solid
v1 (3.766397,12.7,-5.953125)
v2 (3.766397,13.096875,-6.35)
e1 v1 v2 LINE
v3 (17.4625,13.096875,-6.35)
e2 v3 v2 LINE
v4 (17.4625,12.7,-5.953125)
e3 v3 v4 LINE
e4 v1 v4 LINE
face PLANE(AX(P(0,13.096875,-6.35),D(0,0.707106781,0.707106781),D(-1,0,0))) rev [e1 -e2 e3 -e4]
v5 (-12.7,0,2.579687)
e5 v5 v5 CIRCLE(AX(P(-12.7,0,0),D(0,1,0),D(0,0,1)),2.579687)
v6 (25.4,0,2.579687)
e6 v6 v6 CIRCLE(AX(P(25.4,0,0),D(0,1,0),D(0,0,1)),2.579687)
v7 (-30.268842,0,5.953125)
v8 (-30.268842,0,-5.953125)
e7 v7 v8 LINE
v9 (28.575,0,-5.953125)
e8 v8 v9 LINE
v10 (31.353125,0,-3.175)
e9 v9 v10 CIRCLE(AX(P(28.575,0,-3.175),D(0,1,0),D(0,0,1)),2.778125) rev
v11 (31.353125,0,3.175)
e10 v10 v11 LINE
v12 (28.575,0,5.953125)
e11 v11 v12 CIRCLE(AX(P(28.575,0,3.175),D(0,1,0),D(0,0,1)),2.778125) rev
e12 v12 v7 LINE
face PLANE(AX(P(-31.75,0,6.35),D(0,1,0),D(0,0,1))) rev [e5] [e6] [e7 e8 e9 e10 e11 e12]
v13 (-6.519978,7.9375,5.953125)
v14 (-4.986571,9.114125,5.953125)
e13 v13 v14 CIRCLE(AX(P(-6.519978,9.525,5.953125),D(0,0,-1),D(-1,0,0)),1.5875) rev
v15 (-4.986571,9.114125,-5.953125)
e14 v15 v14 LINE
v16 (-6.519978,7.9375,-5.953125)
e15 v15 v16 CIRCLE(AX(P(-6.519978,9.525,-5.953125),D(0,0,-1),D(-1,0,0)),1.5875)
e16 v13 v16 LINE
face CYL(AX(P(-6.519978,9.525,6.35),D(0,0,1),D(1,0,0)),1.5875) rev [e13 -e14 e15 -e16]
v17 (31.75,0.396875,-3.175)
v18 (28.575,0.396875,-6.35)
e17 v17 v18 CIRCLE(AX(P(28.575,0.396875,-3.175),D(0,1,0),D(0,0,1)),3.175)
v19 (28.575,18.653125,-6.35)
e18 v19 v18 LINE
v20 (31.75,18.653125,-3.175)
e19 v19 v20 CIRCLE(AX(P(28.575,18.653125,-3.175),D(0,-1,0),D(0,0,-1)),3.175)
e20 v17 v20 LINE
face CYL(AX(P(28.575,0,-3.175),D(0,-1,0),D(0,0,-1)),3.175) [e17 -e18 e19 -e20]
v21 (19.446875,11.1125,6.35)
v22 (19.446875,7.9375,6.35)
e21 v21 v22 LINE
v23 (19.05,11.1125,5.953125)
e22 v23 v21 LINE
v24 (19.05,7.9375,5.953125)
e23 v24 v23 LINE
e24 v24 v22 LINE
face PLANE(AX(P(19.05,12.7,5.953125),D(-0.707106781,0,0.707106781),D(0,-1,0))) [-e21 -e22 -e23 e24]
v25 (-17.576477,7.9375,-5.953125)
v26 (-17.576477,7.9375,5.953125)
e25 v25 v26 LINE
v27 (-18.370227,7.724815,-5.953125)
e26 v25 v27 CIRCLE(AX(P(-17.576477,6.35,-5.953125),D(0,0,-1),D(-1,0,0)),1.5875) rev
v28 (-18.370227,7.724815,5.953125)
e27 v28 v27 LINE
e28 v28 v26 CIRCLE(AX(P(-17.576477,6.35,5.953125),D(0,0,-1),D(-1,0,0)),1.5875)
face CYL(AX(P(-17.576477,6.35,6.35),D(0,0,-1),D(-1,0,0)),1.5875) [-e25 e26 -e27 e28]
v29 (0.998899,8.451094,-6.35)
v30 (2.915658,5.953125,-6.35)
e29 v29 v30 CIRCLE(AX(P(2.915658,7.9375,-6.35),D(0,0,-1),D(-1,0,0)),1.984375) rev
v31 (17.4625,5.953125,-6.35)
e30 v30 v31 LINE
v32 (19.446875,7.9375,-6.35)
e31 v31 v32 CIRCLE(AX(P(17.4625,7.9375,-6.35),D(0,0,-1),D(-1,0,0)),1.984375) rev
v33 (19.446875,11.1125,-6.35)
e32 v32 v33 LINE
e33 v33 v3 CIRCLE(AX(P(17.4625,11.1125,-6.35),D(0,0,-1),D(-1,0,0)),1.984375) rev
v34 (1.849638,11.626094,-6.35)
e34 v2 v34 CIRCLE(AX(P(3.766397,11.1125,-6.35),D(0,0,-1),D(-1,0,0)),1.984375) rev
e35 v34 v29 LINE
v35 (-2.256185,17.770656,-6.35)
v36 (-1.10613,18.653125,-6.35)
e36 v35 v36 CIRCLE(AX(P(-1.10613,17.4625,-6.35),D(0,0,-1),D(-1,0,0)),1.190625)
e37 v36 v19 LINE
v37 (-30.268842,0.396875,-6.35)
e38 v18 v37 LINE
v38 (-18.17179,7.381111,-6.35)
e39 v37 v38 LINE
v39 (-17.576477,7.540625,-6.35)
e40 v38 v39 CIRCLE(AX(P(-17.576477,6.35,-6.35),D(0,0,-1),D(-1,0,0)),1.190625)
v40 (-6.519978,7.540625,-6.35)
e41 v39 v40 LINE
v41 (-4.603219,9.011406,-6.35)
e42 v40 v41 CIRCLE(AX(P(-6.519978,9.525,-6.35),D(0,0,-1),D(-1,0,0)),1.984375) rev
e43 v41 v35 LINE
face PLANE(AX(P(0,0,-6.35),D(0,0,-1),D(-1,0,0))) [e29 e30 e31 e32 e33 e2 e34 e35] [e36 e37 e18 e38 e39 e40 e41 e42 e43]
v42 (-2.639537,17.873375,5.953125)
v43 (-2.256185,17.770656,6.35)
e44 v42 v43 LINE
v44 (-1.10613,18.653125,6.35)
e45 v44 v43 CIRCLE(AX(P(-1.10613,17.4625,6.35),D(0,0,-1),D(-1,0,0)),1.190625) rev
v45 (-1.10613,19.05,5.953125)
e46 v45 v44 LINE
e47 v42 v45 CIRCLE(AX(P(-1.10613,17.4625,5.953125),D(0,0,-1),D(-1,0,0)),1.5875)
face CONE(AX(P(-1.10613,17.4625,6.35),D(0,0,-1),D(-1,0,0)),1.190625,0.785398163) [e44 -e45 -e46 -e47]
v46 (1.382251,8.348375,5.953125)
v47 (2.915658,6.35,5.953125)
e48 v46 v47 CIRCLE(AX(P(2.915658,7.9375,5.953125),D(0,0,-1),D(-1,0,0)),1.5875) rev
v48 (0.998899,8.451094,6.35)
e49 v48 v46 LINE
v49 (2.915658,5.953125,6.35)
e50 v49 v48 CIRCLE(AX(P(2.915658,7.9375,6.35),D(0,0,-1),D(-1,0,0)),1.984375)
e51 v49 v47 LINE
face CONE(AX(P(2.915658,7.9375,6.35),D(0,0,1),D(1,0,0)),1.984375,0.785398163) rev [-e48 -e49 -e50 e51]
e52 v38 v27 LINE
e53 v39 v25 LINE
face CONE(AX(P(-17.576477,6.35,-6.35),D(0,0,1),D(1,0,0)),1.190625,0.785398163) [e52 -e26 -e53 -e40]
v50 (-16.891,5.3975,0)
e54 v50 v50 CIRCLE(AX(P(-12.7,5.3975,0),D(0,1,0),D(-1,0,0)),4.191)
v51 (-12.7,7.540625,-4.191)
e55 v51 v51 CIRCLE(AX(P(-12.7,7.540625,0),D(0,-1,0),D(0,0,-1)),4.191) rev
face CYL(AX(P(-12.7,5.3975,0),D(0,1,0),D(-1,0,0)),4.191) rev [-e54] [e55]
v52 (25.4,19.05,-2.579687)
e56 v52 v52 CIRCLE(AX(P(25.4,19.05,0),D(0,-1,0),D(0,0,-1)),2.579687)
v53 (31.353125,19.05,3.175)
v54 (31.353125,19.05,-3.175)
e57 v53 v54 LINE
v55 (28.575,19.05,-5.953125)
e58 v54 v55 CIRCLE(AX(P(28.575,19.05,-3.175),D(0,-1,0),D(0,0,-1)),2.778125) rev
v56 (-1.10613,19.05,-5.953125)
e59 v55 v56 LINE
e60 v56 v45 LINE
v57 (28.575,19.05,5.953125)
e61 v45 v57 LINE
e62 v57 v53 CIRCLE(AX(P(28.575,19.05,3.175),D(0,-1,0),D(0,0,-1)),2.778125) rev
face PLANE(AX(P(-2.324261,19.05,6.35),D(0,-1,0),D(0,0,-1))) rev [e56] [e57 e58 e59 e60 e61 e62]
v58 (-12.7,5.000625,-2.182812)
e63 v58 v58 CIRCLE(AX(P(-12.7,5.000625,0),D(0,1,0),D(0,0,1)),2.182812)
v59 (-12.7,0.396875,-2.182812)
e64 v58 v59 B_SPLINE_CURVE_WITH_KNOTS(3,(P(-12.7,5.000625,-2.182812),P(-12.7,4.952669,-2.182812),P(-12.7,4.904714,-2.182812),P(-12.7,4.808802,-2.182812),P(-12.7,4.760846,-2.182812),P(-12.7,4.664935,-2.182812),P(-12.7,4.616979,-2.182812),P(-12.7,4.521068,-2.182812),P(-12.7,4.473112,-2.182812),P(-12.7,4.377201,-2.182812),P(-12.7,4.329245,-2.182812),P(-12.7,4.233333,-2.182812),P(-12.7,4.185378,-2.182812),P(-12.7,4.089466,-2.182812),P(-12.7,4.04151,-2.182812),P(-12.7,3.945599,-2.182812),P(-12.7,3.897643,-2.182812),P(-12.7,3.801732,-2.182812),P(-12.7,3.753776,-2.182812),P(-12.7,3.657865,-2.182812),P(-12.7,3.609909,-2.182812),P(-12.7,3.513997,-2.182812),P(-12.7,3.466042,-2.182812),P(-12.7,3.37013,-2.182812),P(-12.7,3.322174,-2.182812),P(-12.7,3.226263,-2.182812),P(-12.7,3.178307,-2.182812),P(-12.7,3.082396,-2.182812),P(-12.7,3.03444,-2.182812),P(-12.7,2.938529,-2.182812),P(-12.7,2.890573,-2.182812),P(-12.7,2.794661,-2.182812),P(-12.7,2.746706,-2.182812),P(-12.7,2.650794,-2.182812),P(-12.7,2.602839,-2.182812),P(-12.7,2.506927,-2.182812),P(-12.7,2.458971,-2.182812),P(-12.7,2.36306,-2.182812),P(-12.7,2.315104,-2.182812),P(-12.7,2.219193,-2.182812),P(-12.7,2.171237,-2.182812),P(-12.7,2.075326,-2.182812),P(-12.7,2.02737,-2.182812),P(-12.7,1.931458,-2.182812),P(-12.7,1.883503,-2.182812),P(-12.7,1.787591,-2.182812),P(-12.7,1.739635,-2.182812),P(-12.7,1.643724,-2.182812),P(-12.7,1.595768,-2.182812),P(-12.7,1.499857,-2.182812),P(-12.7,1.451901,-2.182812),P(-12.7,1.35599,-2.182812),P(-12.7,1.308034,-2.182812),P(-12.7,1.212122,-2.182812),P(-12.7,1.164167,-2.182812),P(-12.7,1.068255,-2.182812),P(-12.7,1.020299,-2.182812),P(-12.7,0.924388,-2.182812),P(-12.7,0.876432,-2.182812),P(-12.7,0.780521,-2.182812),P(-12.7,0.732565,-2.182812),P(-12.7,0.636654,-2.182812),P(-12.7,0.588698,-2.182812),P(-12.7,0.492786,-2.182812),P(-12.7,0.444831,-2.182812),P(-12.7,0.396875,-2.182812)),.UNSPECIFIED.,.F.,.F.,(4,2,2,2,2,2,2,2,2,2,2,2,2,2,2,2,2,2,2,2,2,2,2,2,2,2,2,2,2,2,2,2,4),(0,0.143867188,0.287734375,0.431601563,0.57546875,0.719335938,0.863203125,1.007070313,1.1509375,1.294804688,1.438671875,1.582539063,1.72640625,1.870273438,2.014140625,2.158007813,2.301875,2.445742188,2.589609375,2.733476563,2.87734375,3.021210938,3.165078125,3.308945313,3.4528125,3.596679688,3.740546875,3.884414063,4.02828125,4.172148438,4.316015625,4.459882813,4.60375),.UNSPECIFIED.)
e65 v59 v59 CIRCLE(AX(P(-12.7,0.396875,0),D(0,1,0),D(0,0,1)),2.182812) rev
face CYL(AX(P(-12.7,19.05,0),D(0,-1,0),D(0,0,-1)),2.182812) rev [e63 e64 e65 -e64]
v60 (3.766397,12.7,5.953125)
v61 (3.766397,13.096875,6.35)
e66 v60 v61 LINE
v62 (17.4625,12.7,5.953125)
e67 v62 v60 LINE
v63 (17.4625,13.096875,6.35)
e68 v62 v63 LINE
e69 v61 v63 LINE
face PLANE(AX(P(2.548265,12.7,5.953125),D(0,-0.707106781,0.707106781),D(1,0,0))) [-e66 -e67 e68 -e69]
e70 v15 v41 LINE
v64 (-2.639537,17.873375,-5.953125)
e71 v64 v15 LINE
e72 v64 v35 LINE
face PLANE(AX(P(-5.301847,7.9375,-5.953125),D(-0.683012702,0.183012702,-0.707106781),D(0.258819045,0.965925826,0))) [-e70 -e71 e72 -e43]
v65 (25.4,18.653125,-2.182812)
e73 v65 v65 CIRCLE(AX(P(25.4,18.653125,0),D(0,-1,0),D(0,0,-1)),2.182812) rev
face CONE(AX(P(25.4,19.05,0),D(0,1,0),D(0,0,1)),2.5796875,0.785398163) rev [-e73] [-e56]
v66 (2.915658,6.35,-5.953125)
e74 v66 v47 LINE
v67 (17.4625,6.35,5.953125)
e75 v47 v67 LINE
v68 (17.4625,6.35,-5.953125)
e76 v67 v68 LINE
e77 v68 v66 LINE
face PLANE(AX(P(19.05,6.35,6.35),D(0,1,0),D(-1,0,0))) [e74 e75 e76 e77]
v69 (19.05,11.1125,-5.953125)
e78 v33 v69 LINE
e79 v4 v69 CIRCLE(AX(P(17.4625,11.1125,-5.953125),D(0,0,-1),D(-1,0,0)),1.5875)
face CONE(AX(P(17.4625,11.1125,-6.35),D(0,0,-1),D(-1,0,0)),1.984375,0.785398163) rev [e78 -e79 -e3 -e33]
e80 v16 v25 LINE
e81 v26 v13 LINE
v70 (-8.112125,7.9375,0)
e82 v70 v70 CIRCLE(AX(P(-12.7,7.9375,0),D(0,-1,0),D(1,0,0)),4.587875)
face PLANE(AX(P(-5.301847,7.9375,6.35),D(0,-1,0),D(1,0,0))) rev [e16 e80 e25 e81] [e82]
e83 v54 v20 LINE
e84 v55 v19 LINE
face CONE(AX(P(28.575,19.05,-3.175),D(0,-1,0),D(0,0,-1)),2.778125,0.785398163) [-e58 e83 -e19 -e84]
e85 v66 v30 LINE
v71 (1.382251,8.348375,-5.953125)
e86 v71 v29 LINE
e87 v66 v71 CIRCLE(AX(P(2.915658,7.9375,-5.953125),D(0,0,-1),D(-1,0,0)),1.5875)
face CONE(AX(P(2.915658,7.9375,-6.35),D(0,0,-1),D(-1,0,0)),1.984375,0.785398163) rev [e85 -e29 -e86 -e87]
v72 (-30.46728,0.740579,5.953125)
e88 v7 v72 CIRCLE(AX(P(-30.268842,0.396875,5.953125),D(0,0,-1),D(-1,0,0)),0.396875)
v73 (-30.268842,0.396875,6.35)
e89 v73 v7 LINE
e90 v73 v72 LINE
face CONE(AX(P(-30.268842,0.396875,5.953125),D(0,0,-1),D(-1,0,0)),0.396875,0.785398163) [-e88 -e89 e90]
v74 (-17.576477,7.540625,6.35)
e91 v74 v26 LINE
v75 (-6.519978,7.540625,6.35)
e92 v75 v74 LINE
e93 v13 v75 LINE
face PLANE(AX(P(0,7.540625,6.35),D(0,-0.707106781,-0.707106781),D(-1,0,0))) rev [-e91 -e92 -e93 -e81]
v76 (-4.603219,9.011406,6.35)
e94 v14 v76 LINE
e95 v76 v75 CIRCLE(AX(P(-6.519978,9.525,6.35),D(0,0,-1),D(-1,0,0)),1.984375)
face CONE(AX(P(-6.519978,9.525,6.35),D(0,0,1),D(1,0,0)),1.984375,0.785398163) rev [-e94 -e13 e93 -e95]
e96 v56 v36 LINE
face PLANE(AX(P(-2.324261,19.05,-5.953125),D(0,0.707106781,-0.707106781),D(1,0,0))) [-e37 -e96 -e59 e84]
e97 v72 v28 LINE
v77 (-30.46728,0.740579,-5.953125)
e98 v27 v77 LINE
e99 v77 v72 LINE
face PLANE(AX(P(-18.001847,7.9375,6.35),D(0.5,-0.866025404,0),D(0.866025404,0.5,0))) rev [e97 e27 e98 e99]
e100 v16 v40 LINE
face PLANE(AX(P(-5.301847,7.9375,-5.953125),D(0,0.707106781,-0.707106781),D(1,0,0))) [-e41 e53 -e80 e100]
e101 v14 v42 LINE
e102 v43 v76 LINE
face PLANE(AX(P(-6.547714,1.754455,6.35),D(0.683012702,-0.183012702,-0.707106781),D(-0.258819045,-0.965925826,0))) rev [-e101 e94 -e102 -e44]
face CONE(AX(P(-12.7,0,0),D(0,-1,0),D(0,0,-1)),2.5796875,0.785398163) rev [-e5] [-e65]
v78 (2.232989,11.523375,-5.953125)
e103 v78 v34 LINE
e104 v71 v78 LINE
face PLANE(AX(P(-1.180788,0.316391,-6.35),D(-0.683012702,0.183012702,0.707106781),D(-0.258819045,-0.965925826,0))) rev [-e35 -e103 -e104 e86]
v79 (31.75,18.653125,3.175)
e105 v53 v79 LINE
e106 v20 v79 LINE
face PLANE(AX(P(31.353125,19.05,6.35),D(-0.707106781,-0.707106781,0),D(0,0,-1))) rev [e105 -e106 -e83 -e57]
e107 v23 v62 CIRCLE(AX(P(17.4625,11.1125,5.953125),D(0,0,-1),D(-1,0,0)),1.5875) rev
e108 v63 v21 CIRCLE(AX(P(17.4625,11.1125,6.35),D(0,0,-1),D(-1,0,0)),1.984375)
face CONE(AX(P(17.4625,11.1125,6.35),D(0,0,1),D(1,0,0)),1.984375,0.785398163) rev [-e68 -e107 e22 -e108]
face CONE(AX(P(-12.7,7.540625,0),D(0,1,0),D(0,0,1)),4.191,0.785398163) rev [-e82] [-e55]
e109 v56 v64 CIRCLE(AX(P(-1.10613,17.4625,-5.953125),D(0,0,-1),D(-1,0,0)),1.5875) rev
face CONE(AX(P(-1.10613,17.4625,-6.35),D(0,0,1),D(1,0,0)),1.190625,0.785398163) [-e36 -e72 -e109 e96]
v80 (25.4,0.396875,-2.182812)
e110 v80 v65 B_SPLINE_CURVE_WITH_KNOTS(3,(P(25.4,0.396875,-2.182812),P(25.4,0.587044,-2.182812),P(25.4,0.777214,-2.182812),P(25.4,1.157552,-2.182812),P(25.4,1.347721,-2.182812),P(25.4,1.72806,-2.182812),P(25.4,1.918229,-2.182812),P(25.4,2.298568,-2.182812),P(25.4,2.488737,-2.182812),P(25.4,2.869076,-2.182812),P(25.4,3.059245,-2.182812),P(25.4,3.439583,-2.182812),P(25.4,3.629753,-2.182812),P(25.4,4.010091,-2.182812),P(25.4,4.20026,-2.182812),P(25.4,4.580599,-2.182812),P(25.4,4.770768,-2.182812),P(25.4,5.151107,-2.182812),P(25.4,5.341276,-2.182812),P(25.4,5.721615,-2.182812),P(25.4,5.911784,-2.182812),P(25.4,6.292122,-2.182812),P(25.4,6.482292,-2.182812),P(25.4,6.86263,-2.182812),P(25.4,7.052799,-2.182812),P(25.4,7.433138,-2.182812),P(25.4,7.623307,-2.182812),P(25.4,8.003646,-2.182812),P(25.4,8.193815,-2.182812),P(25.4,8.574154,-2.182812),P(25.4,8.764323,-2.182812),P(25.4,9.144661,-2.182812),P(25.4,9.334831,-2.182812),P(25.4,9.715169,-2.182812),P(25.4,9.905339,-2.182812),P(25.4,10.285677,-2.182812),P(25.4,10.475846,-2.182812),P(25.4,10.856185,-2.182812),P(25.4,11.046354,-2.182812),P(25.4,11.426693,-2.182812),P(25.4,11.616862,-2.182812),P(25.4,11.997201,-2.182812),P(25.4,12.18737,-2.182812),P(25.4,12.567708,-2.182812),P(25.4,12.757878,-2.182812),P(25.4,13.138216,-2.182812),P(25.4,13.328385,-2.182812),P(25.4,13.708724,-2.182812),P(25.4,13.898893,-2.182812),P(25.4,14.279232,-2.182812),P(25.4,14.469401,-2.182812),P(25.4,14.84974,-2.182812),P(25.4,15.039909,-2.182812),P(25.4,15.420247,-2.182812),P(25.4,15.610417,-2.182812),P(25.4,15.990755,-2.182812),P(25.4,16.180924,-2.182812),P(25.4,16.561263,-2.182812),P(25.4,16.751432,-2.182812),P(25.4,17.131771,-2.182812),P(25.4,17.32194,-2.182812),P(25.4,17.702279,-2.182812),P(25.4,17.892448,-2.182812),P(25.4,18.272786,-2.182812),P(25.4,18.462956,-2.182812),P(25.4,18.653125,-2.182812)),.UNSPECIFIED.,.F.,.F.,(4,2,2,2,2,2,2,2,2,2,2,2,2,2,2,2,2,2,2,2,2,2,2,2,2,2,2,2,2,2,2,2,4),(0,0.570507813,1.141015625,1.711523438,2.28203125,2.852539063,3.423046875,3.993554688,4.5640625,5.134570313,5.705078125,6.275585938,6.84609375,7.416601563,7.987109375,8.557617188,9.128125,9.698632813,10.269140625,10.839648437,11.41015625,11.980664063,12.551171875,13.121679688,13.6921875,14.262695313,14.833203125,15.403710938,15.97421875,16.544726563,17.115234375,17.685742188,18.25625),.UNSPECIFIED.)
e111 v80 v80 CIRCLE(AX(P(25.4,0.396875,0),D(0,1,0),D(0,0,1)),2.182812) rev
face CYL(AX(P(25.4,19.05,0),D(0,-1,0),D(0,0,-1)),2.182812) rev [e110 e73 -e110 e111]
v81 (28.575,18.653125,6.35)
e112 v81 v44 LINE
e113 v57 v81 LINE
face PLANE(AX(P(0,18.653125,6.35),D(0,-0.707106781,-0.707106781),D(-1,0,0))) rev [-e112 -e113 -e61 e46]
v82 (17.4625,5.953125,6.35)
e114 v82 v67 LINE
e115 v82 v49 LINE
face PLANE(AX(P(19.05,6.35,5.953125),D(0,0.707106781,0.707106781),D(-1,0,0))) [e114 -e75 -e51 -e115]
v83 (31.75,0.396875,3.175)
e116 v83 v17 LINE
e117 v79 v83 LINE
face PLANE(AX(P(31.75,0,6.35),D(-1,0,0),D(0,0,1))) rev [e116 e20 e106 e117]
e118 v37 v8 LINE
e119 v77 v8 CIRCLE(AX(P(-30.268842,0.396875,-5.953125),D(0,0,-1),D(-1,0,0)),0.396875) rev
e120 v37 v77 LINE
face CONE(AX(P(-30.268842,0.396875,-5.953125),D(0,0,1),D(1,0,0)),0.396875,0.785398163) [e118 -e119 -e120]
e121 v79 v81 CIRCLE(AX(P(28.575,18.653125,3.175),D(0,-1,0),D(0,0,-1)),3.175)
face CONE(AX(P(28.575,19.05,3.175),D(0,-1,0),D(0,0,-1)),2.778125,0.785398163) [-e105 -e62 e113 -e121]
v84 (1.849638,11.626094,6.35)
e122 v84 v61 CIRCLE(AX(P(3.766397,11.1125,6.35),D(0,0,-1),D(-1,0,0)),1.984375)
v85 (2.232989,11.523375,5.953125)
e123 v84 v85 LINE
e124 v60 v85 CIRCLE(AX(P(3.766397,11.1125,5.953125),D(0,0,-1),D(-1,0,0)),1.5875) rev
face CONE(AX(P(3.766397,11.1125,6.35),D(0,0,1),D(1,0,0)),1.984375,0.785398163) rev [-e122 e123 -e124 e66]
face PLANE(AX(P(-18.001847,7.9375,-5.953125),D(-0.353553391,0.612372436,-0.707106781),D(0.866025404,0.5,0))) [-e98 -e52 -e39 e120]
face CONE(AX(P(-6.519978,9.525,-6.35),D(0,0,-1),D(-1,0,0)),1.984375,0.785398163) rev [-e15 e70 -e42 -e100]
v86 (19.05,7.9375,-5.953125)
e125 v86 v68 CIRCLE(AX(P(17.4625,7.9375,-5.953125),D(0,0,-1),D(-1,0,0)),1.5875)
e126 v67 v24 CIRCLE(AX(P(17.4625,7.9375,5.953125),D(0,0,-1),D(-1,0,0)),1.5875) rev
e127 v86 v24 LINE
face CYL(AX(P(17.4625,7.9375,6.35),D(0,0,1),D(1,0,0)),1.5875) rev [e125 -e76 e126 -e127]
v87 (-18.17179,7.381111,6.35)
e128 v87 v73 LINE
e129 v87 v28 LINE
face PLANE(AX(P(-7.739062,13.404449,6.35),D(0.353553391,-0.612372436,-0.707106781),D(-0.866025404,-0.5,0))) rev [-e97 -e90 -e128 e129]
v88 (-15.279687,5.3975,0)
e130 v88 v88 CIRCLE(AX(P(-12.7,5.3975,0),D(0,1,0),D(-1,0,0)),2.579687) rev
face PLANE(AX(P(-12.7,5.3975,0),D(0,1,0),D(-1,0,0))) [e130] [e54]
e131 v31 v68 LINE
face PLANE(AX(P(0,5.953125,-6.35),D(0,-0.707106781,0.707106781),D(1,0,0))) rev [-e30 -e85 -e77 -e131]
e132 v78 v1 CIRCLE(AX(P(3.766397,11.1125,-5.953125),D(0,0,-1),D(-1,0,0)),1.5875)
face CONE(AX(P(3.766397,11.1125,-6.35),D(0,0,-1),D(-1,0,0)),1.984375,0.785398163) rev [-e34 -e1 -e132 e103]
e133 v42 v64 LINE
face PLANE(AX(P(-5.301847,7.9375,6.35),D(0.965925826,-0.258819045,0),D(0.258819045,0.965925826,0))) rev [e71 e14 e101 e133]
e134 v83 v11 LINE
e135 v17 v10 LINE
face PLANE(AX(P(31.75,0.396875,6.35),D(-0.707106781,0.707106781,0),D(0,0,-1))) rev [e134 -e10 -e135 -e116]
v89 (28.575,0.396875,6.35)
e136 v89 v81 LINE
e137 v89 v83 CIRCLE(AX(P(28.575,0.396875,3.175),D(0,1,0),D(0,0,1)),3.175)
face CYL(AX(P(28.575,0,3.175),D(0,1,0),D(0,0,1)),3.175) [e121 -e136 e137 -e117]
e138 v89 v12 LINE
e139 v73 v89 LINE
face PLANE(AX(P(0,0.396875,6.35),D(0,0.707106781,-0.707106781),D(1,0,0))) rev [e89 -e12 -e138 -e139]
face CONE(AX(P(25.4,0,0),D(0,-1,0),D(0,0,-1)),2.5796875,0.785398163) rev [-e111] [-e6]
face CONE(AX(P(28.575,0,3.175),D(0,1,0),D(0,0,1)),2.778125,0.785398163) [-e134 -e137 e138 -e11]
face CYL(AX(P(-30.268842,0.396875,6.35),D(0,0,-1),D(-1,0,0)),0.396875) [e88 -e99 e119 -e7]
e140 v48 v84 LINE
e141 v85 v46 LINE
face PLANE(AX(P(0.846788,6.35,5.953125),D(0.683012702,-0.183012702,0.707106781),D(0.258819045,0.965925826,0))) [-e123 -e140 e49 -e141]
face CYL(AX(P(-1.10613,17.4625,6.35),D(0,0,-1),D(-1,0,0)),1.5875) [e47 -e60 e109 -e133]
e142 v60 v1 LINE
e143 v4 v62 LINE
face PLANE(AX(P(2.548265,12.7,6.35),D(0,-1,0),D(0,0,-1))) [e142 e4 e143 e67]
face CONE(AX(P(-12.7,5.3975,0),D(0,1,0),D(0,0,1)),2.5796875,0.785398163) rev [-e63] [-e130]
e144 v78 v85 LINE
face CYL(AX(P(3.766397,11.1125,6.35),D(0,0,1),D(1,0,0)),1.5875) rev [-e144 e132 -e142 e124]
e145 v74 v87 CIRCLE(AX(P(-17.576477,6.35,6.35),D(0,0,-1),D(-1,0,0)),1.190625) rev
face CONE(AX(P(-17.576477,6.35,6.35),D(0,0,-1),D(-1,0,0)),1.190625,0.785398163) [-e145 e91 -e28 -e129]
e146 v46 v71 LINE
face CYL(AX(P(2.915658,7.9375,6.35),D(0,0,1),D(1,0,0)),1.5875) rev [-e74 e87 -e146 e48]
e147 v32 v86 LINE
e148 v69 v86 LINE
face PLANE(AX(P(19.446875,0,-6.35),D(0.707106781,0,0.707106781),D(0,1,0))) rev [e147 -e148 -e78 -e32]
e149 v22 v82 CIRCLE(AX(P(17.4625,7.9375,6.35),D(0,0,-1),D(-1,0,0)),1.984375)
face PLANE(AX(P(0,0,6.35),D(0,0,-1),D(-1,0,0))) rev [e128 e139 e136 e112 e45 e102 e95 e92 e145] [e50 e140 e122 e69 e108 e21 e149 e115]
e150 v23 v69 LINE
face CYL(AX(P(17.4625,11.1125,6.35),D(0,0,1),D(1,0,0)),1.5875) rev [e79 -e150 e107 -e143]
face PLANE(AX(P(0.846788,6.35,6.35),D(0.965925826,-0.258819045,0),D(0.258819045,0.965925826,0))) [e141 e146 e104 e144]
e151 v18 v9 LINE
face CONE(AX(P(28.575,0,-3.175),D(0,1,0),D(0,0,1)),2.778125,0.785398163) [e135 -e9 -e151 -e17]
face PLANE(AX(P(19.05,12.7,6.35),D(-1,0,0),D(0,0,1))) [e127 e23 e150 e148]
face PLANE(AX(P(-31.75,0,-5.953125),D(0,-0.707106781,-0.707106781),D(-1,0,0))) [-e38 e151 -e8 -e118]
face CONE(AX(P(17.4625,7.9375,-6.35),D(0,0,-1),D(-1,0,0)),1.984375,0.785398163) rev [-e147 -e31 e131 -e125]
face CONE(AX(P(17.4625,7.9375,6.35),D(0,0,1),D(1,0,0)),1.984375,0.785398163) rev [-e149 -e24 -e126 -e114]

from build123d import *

# Parameters (mm, degrees)
BOSS_EXTRUDE1_DEPTH     = 6.35
CUT_EXTRUDE1_DEPTH      = 38.567106623
CUT_EXTRUDE1_DEPTH_BACK = 38.567106623
SKETCH2_R               = 2.1828125
SKETCH3_R               = 4.191
CUT_EXTRUDE2_DEPTH      = 2.54
FILLET1_R               = 0.396875
FILLET2_R               = 1.5875
FILLET3_R               = 3.175
CHAMFER1_SIZE           = 0.396875


with BuildPart() as part:
    # Sketch1 → Boss-Extrude1 (new, symmetric)
    with BuildSketch(Plane.XY):
        Polygon((-31.75, 0), (31.75, 0), (31.75, 19.05), (-2.324261314, 19.05), (-5.301846715, 7.9375), (-18.001846715, 7.9375), align=None)
        Polygon((19.05, 12.7), (19.05, 6.35), (0.846787688, 6.35), (2.54826506, 12.7), align=None, mode=Mode.SUBTRACT)
    extrude(amount=BOSS_EXTRUDE1_DEPTH, both=True)

    # Sketch2 → Cut-Extrude1 (cut, two sides: drawn at the far end of the back side and taken through both)
    with BuildSketch(Plane.XZ.offset(-CUT_EXTRUDE1_DEPTH_BACK)):
        with Locations(Location((-12.7, 0, 0), (0, 0, 270))):
            Circle(SKETCH2_R)
        with Locations(Location((25.4, 0, 0), (0, 0, 270))):
            Circle(SKETCH2_R)
    extrude(amount=CUT_EXTRUDE1_DEPTH + CUT_EXTRUDE1_DEPTH_BACK, mode=Mode.SUBTRACT)

    # Sketch3 → Cut-Extrude2 (cut)
    with BuildSketch(Plane(origin=(0, 7.9375, 0), x_dir=(1, 0, 0), z_dir=(0, 1, 0))):
        with Locations(Location((-12.7, 0, 0), (0, 0, 180))):
            Circle(SKETCH3_R)
    extrude(amount=-CUT_EXTRUDE2_DEPTH, mode=Mode.SUBTRACT)

    # Fillet1
    fillet1_edges = [part.edges().sort_by_distance(p)[0] for p in [
        (-31.75, 0, 0),
    ]]
    fillet(fillet1_edges, radius=FILLET1_R)

    # Fillet2
    fillet2_edges = [part.edges().sort_by_distance(p)[0] for p in [
        (-18.001846715, 7.9375, 0),
        (-5.301846715, 7.9375, 0),
        (-2.324261314, 19.05, 0),
        (19.05, 12.7, 0),
        (2.54826506, 12.7, 0),
        (0.846787688, 6.35, 0),
        (19.05, 6.35, 0),
    ]]
    fillet(fillet2_edges, radius=FILLET2_R)

    # Fillet3
    fillet3_edges = [part.edges().sort_by_distance(p)[0] for p in [
        (31.75, 9.525, 6.35),
        (31.75, 9.525, -6.35),
    ]]
    fillet(fillet3_edges, radius=FILLET3_R)

    # Chamfer1
    chamfer1_edges = [part.edges().sort_by_distance(p)[0] for p in [
        (31.75, 19.05, 0),
        (31.75, 0, 0),
        (13.73443514, 19.05, -6.35),
        (13.73443514, 19.05, 6.35),
        (30.82006403, 19.05, 5.42006403),
        (30.82006403, 19.05, -5.42006403),
        (30.82006403, 0, 5.42006403),
        (30.82006403, 0, -5.42006403),
        (-12.7, 0, 2.1828125),
        (25.4, 19.05, 2.1828125),
        (25.4, 0, 2.1828125),
        (-8.509, 7.9375, 0),
        (-12.7, 5.3975, 2.1828125),
        (-0.846921168, 0, -6.35),
        (-0.846921168, 0, 6.35),
        (-30.652194148, 0.294156191, -6.35),
        (-30.652194148, 0.294156191, 6.35),
        (-12.04822784, 7.9375, -6.35),
        (-12.04822784, 7.9375, 6.35),
        (-3.813054014, 13.49375, -6.35),
        (-3.813054014, 13.49375, 6.35),
        (-24.418753604, 4.23269708, -6.35),
        (-24.418753604, 4.23269708, 6.35),
        (19.05, 9.525, -6.35),
        (10.614448327, 12.7, -6.35),
        (1.807620061, 9.935875234, -6.35),
        (10.189078984, 6.35, -6.35),
        (-2.072538489, 18.721948428, -6.35),
        (-17.987352606, 7.883407249, -6.35),
        (10.614448327, 12.7, 6.35),
        (19.05, 9.525, 6.35),
        (10.189078984, 6.35, 6.35),
        (1.807620061, 9.935875234, 6.35),
        (-2.072538489, 18.721948428, 6.35),
        (-17.987352606, 7.883407249, 6.35),
        (-5.55356954, 8.265551572, -6.35),
        (-5.55356954, 8.265551572, 6.35),
        (1.656209539, 6.971091231, -6.35),
        (1.656209539, 6.971091231, 6.35),
        (2.799987885, 12.371948428, -6.35),
        (2.799987885, 12.371948428, 6.35),
        (18.585032015, 12.235032015, -6.35),
        (18.585032015, 12.235032015, 6.35),
        (18.585032015, 6.814967985, -6.35),
        (18.585032015, 6.814967985, 6.35),
    ]]
    chamfer(chamfer1_edges, length=CHAMFER1_SIZE - 0.0001)  # a hair under: the kernel refuses the full size


solid = part.part
